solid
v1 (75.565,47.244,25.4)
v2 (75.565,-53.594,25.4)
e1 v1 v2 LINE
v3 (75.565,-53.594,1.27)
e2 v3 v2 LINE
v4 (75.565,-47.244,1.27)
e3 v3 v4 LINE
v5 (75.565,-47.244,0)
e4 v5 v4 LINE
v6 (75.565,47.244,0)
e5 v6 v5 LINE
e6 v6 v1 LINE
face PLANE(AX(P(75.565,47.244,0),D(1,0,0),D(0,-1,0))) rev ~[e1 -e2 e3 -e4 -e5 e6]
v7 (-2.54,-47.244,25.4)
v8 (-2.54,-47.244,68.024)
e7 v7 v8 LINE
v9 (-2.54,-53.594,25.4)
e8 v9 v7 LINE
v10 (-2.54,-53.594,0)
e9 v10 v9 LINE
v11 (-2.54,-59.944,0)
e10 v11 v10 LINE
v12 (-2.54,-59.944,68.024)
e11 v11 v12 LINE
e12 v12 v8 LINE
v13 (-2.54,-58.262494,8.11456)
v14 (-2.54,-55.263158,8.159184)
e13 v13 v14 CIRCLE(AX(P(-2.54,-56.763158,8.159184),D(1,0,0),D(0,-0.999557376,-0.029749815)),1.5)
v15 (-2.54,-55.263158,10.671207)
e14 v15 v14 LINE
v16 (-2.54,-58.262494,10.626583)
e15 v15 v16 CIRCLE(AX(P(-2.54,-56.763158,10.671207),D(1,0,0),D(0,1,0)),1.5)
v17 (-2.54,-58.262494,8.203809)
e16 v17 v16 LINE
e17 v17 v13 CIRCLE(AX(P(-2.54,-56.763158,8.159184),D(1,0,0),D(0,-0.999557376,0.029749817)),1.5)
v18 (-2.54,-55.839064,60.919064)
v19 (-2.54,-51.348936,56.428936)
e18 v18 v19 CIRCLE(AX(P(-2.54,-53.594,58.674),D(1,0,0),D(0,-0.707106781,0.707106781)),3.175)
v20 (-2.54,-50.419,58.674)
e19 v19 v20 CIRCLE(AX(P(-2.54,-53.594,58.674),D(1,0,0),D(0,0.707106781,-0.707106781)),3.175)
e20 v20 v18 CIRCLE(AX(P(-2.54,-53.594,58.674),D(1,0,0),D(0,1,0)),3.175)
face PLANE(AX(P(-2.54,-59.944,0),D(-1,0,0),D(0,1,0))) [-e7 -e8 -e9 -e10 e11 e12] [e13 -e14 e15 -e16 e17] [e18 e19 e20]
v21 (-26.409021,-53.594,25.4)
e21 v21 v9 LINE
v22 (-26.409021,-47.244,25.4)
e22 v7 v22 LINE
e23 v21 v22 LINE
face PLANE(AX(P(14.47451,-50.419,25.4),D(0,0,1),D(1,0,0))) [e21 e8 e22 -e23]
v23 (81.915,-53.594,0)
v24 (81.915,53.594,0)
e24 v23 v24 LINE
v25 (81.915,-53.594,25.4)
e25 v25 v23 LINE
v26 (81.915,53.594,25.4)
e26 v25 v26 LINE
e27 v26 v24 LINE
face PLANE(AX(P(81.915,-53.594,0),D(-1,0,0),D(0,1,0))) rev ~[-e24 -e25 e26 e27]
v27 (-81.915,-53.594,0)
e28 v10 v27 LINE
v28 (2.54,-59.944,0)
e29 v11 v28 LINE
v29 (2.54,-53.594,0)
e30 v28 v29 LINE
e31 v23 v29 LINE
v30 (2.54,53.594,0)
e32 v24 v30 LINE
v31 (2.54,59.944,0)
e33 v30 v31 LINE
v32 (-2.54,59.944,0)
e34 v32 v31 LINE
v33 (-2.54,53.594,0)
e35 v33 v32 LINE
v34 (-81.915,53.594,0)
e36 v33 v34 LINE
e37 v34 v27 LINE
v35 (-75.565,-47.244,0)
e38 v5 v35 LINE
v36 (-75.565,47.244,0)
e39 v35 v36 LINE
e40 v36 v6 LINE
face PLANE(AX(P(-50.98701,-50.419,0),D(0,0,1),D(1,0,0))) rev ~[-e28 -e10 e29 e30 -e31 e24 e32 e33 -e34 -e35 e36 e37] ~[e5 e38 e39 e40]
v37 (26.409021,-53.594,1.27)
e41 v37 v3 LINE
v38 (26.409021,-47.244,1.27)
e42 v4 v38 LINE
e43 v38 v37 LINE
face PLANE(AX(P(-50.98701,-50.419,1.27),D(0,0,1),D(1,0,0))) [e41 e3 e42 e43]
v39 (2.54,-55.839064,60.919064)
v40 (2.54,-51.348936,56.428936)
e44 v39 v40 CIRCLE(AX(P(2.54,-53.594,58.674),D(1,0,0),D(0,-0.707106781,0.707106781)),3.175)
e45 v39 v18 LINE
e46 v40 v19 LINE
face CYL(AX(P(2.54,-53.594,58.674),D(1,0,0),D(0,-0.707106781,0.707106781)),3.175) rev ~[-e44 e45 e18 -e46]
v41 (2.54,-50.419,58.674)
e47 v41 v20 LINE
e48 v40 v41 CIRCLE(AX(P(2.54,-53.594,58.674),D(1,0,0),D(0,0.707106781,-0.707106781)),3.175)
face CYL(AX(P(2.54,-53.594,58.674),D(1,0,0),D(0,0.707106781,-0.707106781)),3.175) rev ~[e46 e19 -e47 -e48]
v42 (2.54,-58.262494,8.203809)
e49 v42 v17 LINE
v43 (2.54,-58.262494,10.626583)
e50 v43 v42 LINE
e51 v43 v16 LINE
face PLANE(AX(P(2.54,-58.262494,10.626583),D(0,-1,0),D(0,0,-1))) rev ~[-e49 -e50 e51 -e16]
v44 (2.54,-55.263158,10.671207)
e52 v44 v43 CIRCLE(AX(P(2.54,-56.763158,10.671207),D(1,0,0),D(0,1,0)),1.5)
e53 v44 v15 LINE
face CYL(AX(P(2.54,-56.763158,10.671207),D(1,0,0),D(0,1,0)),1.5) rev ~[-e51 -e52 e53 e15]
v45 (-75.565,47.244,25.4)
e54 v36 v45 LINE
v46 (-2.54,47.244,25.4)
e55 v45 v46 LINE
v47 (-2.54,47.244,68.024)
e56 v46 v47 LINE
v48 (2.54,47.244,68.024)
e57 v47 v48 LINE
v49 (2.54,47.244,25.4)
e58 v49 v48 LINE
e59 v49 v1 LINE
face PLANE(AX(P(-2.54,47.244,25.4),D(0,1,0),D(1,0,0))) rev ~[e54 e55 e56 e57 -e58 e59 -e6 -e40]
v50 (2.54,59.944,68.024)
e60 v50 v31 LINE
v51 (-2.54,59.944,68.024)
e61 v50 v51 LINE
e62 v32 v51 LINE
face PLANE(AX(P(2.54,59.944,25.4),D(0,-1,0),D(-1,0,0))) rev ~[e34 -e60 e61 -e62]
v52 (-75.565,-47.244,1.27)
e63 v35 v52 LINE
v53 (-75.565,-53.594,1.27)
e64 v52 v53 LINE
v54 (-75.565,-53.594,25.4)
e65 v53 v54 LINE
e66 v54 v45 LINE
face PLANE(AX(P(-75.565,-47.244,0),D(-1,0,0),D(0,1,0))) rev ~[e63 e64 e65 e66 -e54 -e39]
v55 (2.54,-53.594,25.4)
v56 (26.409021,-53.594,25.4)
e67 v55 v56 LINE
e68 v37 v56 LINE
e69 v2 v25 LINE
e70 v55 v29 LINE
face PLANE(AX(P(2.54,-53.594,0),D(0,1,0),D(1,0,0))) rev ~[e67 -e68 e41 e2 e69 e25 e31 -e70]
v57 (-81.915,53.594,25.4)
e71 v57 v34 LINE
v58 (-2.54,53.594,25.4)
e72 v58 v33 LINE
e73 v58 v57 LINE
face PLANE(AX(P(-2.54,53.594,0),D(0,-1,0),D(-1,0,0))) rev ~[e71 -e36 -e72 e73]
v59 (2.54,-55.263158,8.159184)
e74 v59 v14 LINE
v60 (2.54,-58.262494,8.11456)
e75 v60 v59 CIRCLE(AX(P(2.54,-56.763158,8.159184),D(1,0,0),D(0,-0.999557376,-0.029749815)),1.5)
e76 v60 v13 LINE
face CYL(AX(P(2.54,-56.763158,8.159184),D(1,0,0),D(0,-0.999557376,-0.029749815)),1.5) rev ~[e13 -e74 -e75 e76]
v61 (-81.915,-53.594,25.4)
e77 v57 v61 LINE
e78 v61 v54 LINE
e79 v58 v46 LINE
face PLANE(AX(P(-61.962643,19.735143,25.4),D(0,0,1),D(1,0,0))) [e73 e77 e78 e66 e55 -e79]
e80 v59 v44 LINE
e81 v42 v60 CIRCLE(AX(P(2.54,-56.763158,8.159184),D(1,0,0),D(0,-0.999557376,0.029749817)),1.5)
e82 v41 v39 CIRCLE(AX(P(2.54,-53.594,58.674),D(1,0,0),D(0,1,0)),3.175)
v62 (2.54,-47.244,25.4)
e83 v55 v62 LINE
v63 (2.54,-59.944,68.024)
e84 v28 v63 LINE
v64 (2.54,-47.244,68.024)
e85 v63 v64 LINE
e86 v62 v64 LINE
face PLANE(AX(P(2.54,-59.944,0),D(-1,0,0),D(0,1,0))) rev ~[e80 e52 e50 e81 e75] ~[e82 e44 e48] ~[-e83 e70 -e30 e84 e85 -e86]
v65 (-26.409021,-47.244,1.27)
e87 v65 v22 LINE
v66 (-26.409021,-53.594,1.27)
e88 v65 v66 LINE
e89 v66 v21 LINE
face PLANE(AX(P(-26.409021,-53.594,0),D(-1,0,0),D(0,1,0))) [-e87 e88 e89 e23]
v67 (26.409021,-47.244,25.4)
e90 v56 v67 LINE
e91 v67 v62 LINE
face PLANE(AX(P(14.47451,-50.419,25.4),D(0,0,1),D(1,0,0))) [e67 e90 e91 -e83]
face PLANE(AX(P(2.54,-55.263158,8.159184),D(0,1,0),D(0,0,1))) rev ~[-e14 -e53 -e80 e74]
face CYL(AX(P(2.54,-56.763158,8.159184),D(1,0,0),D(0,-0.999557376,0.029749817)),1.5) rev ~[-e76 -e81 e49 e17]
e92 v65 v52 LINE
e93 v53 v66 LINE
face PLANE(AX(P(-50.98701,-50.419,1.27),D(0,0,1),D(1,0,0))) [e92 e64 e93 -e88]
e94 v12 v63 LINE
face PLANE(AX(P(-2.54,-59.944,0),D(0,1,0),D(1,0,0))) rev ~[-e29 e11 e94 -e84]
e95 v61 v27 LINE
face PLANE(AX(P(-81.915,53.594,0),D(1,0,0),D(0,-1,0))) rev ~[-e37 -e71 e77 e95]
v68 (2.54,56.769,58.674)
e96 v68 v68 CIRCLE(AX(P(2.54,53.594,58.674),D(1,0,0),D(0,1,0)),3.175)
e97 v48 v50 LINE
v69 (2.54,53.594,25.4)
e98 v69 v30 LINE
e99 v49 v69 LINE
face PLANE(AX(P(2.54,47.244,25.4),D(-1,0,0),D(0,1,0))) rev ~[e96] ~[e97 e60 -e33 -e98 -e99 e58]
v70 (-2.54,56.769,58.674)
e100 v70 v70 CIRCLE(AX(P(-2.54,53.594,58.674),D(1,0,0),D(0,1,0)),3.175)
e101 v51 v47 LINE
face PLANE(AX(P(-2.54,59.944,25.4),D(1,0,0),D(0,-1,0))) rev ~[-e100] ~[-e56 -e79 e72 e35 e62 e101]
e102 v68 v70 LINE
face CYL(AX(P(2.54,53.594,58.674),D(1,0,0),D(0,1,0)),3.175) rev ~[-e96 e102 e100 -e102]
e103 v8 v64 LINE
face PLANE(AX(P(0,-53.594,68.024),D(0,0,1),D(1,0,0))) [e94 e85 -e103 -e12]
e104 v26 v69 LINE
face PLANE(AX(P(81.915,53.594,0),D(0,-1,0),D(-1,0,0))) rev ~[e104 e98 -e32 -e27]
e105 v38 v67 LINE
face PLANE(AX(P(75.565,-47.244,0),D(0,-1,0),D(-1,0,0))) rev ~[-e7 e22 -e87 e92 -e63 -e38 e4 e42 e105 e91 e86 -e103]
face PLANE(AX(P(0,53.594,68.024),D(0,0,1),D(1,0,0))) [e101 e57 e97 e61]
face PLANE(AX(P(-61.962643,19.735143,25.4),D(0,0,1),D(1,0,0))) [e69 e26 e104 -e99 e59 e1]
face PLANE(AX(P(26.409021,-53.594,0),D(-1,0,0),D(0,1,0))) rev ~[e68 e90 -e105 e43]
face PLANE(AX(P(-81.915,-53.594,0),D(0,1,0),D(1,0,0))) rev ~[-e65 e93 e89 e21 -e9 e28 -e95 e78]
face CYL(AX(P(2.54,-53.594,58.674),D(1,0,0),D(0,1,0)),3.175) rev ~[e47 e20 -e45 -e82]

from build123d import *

# Parameters (mm, degrees)
F0_W     = 49.1559793526
F0_H     = 6.35
F0_W_2   = 5.08
F0_W_3   = 23.8690206474
F1_DEPTH = 1.27
F2_DEPTH = 25.4
F3_W     = 5.08
F3_H     = 12.7
F4_DEPTH = 42.624
F6_DEPTH = 25.4
F7_R     = 3.175
F8_DEPTH = 25.4


with BuildPart() as f1:
    # F0 (on Top) → F1 (new body)
    with BuildSketch(Plane.XY):
        with Locations((-50.9870103237, -50.419)):
            Rectangle(F0_W, F0_H)
        Polygon((-75.565, 47.244), (-2.54, 47.244), (-2.54, 53.594), (-81.915, 53.594), (-81.915, -53.594), (-75.565, -53.594), (-75.565, -47.244), align=None)
        with Locations((0, 56.769)):
            Rectangle(F0_W_2, F0_H)
        with Locations((0, 50.419)):
            Rectangle(F0_W_2, F0_H)
        Polygon((2.54, 47.244), (75.565, 47.244), (75.565, -47.244), (75.565, -53.594), (81.915, -53.594), (81.915, 53.594), (2.54, 53.594), align=None)
        with Locations((50.9870103237, -50.419)):
            Rectangle(F0_W, F0_H)
        with Locations((-14.4745103237, -50.419)):
            Rectangle(F0_W_3, F0_H)
        with Locations((0, -50.419)):
            Rectangle(F0_W_2, F0_H)
        with Locations((14.4745103237, -50.419)):
            Rectangle(F0_W_3, F0_H)
        with Locations((0, -56.769)):
            Rectangle(F0_W_2, F0_H)
    extrude(amount=F1_DEPTH)

    # F0 (on Top) → F2 (join)
    with BuildSketch(Plane.XY):
        Polygon((-75.565, 47.244), (-2.54, 47.244), (-2.54, 53.594), (-81.915, 53.594), (-81.915, -53.594), (-75.565, -53.594), (-75.565, -47.244), align=None)
        with Locations((0, 56.769)):
            Rectangle(F0_W_2, F0_H)
        with Locations((0, 50.419)):
            Rectangle(F0_W_2, F0_H)
        Polygon((2.54, 47.244), (75.565, 47.244), (75.565, -47.244), (75.565, -53.594), (81.915, -53.594), (81.915, 53.594), (2.54, 53.594), align=None)
        with Locations((14.4745103237, -50.419)):
            Rectangle(F0_W_3, F0_H)
        with Locations((0, -50.419)):
            Rectangle(F0_W_2, F0_H)
        with Locations((-14.4745103237, -50.419)):
            Rectangle(F0_W_3, F0_H)
        with Locations((0, -56.769)):
            Rectangle(F0_W_2, F0_H)
    extrude(amount=F2_DEPTH)

    # F3 (on face) → F4 (join)
    with BuildSketch(Plane.XY.offset(25.4)):
        Polygon((2.54, 59.944), (-2.54, 59.944), (-2.54, 53.594), (-2.54, 47.244), (2.54, 47.244), (2.54, 53.594), align=None)
        with Locations((0, -53.594)):
            Rectangle(F3_W, F3_H)
    extrude(amount=F4_DEPTH)

    # F5 (on face) → F6 (cut)
    with BuildSketch(Plane.YZ.offset(2.54)):
        with BuildLine():
            Line((-58.2624942683, 8.2038091254), (-58.2624942683, 8.1145596807))
            ThreePointArc((-58.2624942683, 8.1145596807), (-56.7408433733, 6.6593503961), (-55.2631582039, 8.159184403))
            ThreePointArc((-55.2631582039, 8.159184403), (-55.4440615048, 8.8733159724), (-55.9431367352, 9.4151958643))
            ThreePointArc((-55.9431367352, 9.4151958643), (-56.7631582039, 9.1712073255), (-57.5831796726, 9.4151958643))
            ThreePointArc((-57.5831796726, 9.4151958643), (-58.0714851124, 8.8928605581), (-58.2624942683, 8.2038091254))
        make_face()
        with BuildLine():
            ThreePointArc((-58.2624942683, 8.2038091254), (-58.2631582039, 8.159184403), (-58.2624942683, 8.1145596807))
            Line((-58.2624942683, 8.1145596807), (-58.2624942683, 8.2038091254))
        make_face()
        with BuildLine():
            ThreePointArc((-55.9431367352, 9.4151958643), (-55.4440615048, 8.8733159724), (-55.2631582039, 8.159184403))
            Line((-55.2631582039, 8.159184403), (-55.2631582039, 10.6712073255))
            ThreePointArc((-55.2631582039, 10.6712073255), (-55.4440615048, 9.9570757561), (-55.9431367352, 9.4151958643))
        make_face()
        with BuildLine():
            Line((-58.2624942683, 10.6265826032), (-58.2624942683, 8.2038091254))
            ThreePointArc((-58.2624942683, 8.2038091254), (-58.0714851124, 8.8928605581), (-57.5831796726, 9.4151958643))
            ThreePointArc((-57.5831796726, 9.4151958643), (-58.0714851124, 9.9375311705), (-58.2624942683, 10.6265826032))
        make_face()
        with BuildLine():
            ThreePointArc((-57.5831796726, 9.4151958643), (-56.7631582039, 9.659184403), (-55.9431367352, 9.4151958643))
            ThreePointArc((-55.9431367352, 9.4151958643), (-55.4440615048, 9.9570757561), (-55.2631582039, 10.6712073255))
            ThreePointArc((-55.2631582039, 10.6712073255), (-56.7854730345, 12.1710413325), (-58.2624942683, 10.6265826032))
            ThreePointArc((-58.2624942683, 10.6265826032), (-58.0714851124, 9.9375311705), (-57.5831796726, 9.4151958643))
        make_face()
        with BuildLine():
            ThreePointArc((-57.5831796726, 9.4151958643), (-56.7631582039, 9.1712073255), (-55.9431367352, 9.4151958643))
            ThreePointArc((-55.9431367352, 9.4151958643), (-56.7631582039, 9.659184403), (-57.5831796726, 9.4151958643))
        make_face()
    extrude(amount=-F6_DEPTH, mode=Mode.SUBTRACT)

    # F7 (on face) → F8 (cut)
    with BuildSketch(Plane.YZ.offset(2.54)):
        with Locations((53.594, 58.674)):
            Circle(F7_R)
        with BuildLine():
            ThreePointArc((-50.419, 58.674), (-52.3789801022, 61.6073175157), (-55.8390640303, 60.9190640303))
            Line((-55.8390640303, 60.9190640303), (-51.3489359697, 56.4289359697))
            ThreePointArc((-51.3489359697, 56.4289359697), (-50.6606824843, 57.4589801022), (-50.419, 58.674))
        make_face()
        with BuildLine():
            Line((-51.3489359697, 56.4289359697), (-55.8390640303, 60.9190640303))
            ThreePointArc((-55.8390640303, 60.9190640303), (-55.8390640303, 56.4289359697), (-51.3489359697, 56.4289359697))
        make_face()
    extrude(amount=-F8_DEPTH, mode=Mode.SUBTRACT)


solid = f1.part
